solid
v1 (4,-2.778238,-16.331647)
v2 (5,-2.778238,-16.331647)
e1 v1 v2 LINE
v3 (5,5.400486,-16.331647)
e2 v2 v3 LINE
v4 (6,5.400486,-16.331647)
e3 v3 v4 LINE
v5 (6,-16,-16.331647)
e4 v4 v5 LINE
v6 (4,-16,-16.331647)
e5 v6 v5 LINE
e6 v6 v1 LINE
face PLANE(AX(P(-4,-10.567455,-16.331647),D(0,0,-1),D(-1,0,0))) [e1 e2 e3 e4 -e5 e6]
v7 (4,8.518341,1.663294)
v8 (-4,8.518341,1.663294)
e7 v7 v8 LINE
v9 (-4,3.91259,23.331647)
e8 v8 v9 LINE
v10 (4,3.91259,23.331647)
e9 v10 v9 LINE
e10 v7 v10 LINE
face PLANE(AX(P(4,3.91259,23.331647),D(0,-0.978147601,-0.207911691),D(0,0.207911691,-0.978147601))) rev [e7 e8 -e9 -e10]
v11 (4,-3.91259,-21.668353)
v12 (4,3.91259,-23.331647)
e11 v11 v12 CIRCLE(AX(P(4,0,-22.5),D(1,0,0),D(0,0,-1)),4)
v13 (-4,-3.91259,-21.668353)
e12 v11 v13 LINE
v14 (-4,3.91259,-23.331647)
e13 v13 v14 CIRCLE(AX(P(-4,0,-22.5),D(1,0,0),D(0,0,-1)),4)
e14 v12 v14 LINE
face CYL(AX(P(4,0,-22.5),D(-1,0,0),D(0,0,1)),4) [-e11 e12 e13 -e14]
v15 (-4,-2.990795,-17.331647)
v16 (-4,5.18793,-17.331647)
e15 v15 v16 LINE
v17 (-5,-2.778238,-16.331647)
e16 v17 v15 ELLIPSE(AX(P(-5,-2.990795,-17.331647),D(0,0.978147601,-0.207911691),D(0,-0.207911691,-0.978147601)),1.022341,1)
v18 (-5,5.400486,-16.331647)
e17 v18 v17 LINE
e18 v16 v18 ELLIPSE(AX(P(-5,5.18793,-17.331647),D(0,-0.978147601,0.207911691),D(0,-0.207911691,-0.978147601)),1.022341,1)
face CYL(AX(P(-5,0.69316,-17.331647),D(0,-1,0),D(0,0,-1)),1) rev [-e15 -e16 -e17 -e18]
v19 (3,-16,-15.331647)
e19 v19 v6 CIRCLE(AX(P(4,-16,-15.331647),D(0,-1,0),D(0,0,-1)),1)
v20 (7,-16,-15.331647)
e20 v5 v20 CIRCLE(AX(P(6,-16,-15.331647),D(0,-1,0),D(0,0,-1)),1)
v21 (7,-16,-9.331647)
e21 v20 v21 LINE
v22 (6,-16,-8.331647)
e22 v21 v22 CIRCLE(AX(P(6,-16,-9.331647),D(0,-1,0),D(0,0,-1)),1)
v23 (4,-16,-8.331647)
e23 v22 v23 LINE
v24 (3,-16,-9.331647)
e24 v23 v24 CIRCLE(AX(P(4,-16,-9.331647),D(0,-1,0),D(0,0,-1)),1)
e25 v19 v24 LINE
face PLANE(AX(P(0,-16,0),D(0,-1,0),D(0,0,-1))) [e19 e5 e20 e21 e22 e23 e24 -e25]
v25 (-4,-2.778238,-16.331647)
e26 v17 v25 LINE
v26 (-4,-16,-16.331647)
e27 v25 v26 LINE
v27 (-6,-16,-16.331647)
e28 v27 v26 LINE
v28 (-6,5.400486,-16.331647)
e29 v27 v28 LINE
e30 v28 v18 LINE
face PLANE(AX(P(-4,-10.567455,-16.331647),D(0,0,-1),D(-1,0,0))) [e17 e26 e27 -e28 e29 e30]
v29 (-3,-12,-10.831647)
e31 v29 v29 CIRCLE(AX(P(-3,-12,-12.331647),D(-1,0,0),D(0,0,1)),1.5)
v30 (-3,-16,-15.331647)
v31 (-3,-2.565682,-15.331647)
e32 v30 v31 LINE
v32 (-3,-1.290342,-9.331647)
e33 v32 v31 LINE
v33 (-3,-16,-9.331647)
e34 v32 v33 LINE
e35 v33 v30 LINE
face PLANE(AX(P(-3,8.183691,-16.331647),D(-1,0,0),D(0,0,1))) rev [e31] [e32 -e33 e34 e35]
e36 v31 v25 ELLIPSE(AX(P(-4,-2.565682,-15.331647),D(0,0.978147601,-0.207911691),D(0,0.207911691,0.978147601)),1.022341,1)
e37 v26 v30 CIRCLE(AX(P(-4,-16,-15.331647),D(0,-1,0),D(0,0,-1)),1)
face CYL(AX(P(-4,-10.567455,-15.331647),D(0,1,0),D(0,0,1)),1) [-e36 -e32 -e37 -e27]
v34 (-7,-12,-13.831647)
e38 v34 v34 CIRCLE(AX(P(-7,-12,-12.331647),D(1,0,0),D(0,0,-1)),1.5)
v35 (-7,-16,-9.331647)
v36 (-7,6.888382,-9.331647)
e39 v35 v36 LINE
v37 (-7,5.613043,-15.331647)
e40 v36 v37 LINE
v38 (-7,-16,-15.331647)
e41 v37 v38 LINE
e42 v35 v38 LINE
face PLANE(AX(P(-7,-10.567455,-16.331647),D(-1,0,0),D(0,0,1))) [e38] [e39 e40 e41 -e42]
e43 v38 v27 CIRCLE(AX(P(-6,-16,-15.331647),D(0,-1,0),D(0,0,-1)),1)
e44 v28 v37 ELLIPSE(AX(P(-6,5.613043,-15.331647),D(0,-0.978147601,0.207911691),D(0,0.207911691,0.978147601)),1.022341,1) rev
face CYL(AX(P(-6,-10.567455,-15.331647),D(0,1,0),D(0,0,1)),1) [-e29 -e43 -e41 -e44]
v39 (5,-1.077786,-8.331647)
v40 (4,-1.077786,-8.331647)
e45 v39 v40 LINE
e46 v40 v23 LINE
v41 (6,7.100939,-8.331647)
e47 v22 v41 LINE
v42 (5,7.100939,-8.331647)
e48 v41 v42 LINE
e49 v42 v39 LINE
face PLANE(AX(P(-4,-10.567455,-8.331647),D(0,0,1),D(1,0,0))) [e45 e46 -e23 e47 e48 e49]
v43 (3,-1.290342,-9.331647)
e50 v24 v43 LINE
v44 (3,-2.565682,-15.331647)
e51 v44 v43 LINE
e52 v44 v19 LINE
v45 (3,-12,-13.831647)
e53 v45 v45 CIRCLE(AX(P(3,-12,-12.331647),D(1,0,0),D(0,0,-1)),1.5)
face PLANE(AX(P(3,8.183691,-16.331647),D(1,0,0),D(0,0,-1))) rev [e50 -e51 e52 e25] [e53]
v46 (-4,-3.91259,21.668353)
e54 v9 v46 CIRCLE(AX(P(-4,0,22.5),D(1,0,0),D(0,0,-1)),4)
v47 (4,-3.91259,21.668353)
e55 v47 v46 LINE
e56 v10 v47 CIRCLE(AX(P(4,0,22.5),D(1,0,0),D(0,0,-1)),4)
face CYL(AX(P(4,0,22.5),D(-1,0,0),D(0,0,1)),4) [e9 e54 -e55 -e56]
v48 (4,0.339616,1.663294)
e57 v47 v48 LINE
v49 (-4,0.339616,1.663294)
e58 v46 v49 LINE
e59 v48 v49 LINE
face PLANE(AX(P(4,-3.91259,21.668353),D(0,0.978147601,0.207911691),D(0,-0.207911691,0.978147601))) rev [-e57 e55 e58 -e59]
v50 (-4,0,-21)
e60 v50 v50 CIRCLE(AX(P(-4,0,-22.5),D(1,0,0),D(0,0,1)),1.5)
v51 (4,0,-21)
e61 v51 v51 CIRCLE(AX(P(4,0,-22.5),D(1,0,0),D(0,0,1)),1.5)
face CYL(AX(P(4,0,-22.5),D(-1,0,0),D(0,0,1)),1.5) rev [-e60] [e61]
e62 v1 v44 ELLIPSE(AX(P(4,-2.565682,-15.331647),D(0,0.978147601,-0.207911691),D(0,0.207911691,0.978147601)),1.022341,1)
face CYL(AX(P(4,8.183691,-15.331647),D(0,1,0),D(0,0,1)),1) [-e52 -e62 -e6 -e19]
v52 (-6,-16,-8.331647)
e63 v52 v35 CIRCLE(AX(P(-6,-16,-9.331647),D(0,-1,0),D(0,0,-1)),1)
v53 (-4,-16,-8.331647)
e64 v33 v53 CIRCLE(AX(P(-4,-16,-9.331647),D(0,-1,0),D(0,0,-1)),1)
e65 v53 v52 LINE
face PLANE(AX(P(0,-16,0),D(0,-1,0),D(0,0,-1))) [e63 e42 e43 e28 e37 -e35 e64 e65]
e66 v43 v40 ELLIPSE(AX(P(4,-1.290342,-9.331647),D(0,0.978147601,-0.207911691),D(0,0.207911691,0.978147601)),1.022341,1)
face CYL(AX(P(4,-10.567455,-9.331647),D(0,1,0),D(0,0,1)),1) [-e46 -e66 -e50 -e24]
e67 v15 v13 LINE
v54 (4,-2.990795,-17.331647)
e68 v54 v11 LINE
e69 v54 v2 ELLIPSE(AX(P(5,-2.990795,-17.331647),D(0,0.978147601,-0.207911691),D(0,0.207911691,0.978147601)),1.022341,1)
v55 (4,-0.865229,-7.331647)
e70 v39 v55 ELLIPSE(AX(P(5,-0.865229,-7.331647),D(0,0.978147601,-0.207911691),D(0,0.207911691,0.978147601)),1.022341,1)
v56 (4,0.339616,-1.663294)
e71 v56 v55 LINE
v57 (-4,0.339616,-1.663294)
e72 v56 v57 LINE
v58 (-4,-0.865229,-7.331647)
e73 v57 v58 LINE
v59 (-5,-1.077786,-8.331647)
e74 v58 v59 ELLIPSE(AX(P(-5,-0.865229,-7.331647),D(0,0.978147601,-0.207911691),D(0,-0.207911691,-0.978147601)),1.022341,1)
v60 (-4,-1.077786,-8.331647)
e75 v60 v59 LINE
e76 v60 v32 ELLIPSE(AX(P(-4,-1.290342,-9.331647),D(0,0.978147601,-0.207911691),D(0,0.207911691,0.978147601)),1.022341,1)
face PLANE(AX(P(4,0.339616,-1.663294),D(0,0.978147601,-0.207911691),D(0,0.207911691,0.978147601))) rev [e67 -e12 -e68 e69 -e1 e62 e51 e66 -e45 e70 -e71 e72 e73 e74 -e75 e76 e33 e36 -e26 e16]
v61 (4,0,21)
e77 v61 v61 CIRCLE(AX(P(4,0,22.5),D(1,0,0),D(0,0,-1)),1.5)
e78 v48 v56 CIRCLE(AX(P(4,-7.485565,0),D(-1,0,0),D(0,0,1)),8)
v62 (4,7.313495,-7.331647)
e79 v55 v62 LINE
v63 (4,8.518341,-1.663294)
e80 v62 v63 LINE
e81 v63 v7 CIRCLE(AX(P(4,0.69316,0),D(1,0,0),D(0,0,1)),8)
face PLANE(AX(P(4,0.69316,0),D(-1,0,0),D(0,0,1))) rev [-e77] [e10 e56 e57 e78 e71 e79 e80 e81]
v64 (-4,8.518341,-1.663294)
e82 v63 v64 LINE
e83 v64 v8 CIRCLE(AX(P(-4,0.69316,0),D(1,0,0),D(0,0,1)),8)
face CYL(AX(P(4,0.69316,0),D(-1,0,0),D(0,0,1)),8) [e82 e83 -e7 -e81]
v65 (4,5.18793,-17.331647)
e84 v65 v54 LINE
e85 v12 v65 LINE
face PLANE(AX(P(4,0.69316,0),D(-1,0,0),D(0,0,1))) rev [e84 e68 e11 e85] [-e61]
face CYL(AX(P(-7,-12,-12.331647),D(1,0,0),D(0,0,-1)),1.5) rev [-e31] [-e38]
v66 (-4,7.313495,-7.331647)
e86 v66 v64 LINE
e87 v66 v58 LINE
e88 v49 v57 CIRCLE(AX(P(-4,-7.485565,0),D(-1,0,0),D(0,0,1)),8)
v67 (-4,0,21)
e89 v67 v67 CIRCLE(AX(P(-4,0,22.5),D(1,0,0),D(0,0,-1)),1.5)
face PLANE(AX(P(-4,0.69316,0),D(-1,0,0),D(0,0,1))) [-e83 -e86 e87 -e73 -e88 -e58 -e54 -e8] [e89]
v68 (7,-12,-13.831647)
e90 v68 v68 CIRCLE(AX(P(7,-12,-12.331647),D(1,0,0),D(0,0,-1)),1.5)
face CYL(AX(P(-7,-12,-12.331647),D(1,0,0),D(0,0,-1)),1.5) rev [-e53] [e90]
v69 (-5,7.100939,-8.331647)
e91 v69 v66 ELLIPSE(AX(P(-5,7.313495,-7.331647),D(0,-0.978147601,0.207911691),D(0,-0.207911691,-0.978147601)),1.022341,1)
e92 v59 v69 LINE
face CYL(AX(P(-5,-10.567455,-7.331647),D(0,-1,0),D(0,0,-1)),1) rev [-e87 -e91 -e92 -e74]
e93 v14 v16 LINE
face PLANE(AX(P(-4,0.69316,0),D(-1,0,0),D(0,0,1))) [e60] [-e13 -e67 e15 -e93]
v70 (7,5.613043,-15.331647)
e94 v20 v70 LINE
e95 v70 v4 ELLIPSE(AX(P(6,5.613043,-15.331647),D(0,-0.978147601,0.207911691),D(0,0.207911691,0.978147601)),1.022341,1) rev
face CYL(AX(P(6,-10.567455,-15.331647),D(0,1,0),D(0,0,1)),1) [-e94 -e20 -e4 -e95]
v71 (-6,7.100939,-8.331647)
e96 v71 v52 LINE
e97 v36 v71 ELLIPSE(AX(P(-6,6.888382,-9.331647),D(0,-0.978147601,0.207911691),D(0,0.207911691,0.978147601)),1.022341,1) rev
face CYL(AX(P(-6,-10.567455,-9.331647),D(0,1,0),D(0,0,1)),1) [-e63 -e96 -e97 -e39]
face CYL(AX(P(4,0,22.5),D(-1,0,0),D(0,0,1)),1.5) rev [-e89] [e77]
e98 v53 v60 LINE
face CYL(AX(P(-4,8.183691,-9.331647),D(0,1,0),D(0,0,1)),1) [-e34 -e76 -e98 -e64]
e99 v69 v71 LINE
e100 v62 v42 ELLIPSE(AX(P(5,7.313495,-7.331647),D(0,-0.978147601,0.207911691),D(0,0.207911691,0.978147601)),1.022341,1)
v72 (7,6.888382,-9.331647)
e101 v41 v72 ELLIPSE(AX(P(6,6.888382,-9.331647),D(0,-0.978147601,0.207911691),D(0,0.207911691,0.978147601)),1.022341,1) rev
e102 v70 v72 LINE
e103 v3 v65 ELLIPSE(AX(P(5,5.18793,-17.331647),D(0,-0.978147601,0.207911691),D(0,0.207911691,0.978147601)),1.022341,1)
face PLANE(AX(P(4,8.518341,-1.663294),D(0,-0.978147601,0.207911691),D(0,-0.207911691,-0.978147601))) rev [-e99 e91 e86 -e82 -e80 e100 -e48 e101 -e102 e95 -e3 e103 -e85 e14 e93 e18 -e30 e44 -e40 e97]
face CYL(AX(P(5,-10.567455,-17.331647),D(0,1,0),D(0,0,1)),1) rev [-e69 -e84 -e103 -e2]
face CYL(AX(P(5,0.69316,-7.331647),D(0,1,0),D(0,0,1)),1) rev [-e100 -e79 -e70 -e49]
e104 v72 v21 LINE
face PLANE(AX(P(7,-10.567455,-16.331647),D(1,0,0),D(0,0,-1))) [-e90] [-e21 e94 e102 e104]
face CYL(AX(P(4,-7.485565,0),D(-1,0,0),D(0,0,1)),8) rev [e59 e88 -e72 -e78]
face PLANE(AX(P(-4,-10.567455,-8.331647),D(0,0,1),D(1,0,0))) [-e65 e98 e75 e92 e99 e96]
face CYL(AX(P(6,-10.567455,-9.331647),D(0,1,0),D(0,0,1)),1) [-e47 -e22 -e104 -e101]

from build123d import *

# Parameters (mm, degrees)
CROQUIS1_R                          = 1.5
SALIENTE_EXTRUIR1_DEPTH             = 4
SALIENTE_EXTRUIR2_REACH             = 30.175
CROQUIS3_W                          = 3
CROQUIS3_H                          = 8
SALIENTE_EXTRUIR2_DIRECTION_2_REACH = 30.175
CROQUIS4_W                          = 14
CROQUIS4_H                          = 8
SALIENTE_EXTRUIR3_DEPTH             = 16
CORTAR_EXTRUIR2_REACH               = 38.892
CROQUIS7_W                          = 6
CROQUIS7_H                          = 8
REDONDEO1_R                         = 1
CORTAR_EXTRUIR1_DEPTH               = 32.737202145
CORTAR_EXTRUIR1_DEPTH_BACK          = 32.737202145
CROQUIS6_R                          = 1.5


with BuildPart() as part:
    # Croquis1 → Saliente-Extruir1 (new, symmetric)
    with BuildSketch(Plane(origin=(0, 0, 0), x_dir=(0, 0, -1), z_dir=(1, 0, 0))):
        with BuildLine():
            Line((-23.331646763, 3.912590403), (-1.663293527, 8.518341064))
            ThreePointArc((-1.663293527, 8.518341064), (0, 8.693160258), (1.663293527, 8.518341064))
            Line((1.663293527, 8.518341064), (23.331646763, 3.912590403))
            ThreePointArc((23.331646763, 3.912590403), (26.412590403, -0.831646763), (21.668353237, -3.912590403))
            Line((21.668353237, -3.912590403), (1.663293527, 0.339616305))
            ThreePointArc((1.663293527, 0.339616305), (0, 0.514435499), (-1.663293527, 0.339616305))
            Line((-1.663293527, 0.339616305), (-21.668353237, -3.912590403))
            ThreePointArc((-21.668353237, -3.912590403), (-26.412590403, -0.831646763), (-23.331646763, 3.912590403))
        make_face()
        with Locations((-22.5, 0)):
            Circle(CROQUIS1_R, mode=Mode.SUBTRACT)
        with Locations(Location((22.5, 0, 0), (0, 0, 180))):
            Circle(CROQUIS1_R, mode=Mode.SUBTRACT)
    extrude(amount=SALIENTE_EXTRUIR1_DEPTH, both=True)

    # Saliente-Extruir2: up to this plane
    saliente_extruir2_end = Plane(origin=(4, 0.339616305, -1.663293527), z_dir=(0, 0.9781476007338056, -0.20791169081776))
    # Croquis3 → Saliente-Extruir2 (add, up to the surface)
    with BuildSketch(Plane(origin=(0, 0, 0), x_dir=(1, 0, 0), z_dir=(0, 1, 0)), mode=Mode.PRIVATE) as saliente_extruir2_sk1:
        with Locations((-5.5, 12.331646763)):
            Rectangle(CROQUIS3_W, CROQUIS3_H)
    saliente_extruir2_tool1 = split(extrude(saliente_extruir2_sk1.sketch, amount=-SALIENTE_EXTRUIR2_REACH, mode=Mode.PRIVATE), bisect_by=saliente_extruir2_end, keep=Keep.BOTH, mode=Mode.PRIVATE)
    add(saliente_extruir2_tool1.solids().sort_by_distance((-5.5, 0, -12.331647))[0])
    # Croquis3 → Saliente-Extruir2 (add, up to the surface)
    with BuildSketch(Plane(origin=(0, 0, 0), x_dir=(1, 0, 0), z_dir=(0, 1, 0)), mode=Mode.PRIVATE) as saliente_extruir2_sk2:
        with Locations((5.5, 12.331646763)):
            Rectangle(CROQUIS3_W, CROQUIS3_H)
    saliente_extruir2_tool2 = split(extrude(saliente_extruir2_sk2.sketch, amount=-SALIENTE_EXTRUIR2_REACH, mode=Mode.PRIVATE), bisect_by=saliente_extruir2_end, keep=Keep.BOTH, mode=Mode.PRIVATE)
    add(saliente_extruir2_tool2.solids().sort_by_distance((5.5, 0, -12.331647))[0])

    # Saliente-Extruir2 direction 2: up to this plane
    saliente_extruir2_direction_2_end = Plane(origin=(4, 8.518341064, -1.663293527), z_dir=(0, -0.9781476007338056, 0.20791169081776004))
    # Croquis3 → Saliente-Extruir2 direction 2 (add, up to the surface)
    with BuildSketch(Plane(origin=(0, 0, 0), x_dir=(1, 0, 0), z_dir=(0, 1, 0)), mode=Mode.PRIVATE) as saliente_extruir2_direction_2_sk1:
        with Locations((-5.5, 12.331646763)):
            Rectangle(CROQUIS3_W, CROQUIS3_H)
    saliente_extruir2_direction_2_tool1 = split(extrude(saliente_extruir2_direction_2_sk1.sketch, amount=SALIENTE_EXTRUIR2_DIRECTION_2_REACH, mode=Mode.PRIVATE), bisect_by=saliente_extruir2_direction_2_end, keep=Keep.BOTH, mode=Mode.PRIVATE)
    add(saliente_extruir2_direction_2_tool1.solids().sort_by_distance((-5.5, 0, -12.331647))[0])
    # Croquis3 → Saliente-Extruir2 direction 2 (add, up to the surface)
    with BuildSketch(Plane(origin=(0, 0, 0), x_dir=(1, 0, 0), z_dir=(0, 1, 0)), mode=Mode.PRIVATE) as saliente_extruir2_direction_2_sk2:
        with Locations((5.5, 12.331646763)):
            Rectangle(CROQUIS3_W, CROQUIS3_H)
    saliente_extruir2_direction_2_tool2 = split(extrude(saliente_extruir2_direction_2_sk2.sketch, amount=SALIENTE_EXTRUIR2_DIRECTION_2_REACH, mode=Mode.PRIVATE), bisect_by=saliente_extruir2_direction_2_end, keep=Keep.BOTH, mode=Mode.PRIVATE)
    add(saliente_extruir2_direction_2_tool2.solids().sort_by_distance((5.5, 0, -12.331647))[0])

    # Croquis4 → Saliente-Extruir3 (add)
    with BuildSketch(Plane.XZ):
        with Locations((0, -12.331646763)):
            Rectangle(CROQUIS4_W, CROQUIS4_H)
    extrude(amount=SALIENTE_EXTRUIR3_DEPTH)

    # Cortar-Extruir2: up to this plane
    cortar_extruir2_end = Plane(origin=(4, 0.339616305, -1.663293527), z_dir=(0, 0.9781476007338056, -0.20791169081776))
    # Croquis7 → Cortar-Extruir2 (cut, up to the surface)
    with BuildSketch(Plane.XZ.offset(16), mode=Mode.PRIVATE) as cortar_extruir2_sk1:
        with Locations((0, -12.331646763)):
            Rectangle(CROQUIS7_W, CROQUIS7_H)
    cortar_extruir2_tool1 = split(extrude(cortar_extruir2_sk1.sketch, amount=-CORTAR_EXTRUIR2_REACH, mode=Mode.PRIVATE), bisect_by=cortar_extruir2_end, keep=Keep.BOTH, mode=Mode.PRIVATE)
    add(cortar_extruir2_tool1.solids().sort_by_distance((0, -16, -12.331647))[0], mode=Mode.SUBTRACT)

    # Redondeo1
    redondeo1_edges = [part.edges().sort_by_distance(p)[0] for p in [
        (4, 3.011576449, -8.331646763),
        (4, 1.311123955, -16.331646763),
        (-4, 3.011576449, -8.331646763),
        (-4, 1.311123955, -16.331646763),
        (3, -9.389119212, -16.331646763),
        (-3, -9.389119212, -16.331646763),
        (-3, -8.538892965, -8.331646763),
        (3, -8.538892965, -8.331646763),
        (7, -4.449530586, -8.331646763),
        (7, -5.299756833, -16.331646763),
        (-7, -5.299756833, -16.331646763),
        (-7, -4.449530586, -8.331646763),
    ]]
    fillet(redondeo1_edges, radius=REDONDEO1_R - 0.0001)  # a hair under: the kernel refuses the full size

    # Croquis6 → Cortar-Extruir1 (cut, two sides: drawn at the far end of the back side and taken through both)
    with BuildSketch(Plane(origin=(0, 0, 0), x_dir=(0, 0, -1), z_dir=(1, 0, 0)).offset(-CORTAR_EXTRUIR1_DEPTH_BACK)):
        with Locations((12.331646763, -12)):
            Circle(CROQUIS6_R)
    extrude(amount=CORTAR_EXTRUIR1_DEPTH + CORTAR_EXTRUIR1_DEPTH_BACK, mode=Mode.SUBTRACT)


solid = part.part
